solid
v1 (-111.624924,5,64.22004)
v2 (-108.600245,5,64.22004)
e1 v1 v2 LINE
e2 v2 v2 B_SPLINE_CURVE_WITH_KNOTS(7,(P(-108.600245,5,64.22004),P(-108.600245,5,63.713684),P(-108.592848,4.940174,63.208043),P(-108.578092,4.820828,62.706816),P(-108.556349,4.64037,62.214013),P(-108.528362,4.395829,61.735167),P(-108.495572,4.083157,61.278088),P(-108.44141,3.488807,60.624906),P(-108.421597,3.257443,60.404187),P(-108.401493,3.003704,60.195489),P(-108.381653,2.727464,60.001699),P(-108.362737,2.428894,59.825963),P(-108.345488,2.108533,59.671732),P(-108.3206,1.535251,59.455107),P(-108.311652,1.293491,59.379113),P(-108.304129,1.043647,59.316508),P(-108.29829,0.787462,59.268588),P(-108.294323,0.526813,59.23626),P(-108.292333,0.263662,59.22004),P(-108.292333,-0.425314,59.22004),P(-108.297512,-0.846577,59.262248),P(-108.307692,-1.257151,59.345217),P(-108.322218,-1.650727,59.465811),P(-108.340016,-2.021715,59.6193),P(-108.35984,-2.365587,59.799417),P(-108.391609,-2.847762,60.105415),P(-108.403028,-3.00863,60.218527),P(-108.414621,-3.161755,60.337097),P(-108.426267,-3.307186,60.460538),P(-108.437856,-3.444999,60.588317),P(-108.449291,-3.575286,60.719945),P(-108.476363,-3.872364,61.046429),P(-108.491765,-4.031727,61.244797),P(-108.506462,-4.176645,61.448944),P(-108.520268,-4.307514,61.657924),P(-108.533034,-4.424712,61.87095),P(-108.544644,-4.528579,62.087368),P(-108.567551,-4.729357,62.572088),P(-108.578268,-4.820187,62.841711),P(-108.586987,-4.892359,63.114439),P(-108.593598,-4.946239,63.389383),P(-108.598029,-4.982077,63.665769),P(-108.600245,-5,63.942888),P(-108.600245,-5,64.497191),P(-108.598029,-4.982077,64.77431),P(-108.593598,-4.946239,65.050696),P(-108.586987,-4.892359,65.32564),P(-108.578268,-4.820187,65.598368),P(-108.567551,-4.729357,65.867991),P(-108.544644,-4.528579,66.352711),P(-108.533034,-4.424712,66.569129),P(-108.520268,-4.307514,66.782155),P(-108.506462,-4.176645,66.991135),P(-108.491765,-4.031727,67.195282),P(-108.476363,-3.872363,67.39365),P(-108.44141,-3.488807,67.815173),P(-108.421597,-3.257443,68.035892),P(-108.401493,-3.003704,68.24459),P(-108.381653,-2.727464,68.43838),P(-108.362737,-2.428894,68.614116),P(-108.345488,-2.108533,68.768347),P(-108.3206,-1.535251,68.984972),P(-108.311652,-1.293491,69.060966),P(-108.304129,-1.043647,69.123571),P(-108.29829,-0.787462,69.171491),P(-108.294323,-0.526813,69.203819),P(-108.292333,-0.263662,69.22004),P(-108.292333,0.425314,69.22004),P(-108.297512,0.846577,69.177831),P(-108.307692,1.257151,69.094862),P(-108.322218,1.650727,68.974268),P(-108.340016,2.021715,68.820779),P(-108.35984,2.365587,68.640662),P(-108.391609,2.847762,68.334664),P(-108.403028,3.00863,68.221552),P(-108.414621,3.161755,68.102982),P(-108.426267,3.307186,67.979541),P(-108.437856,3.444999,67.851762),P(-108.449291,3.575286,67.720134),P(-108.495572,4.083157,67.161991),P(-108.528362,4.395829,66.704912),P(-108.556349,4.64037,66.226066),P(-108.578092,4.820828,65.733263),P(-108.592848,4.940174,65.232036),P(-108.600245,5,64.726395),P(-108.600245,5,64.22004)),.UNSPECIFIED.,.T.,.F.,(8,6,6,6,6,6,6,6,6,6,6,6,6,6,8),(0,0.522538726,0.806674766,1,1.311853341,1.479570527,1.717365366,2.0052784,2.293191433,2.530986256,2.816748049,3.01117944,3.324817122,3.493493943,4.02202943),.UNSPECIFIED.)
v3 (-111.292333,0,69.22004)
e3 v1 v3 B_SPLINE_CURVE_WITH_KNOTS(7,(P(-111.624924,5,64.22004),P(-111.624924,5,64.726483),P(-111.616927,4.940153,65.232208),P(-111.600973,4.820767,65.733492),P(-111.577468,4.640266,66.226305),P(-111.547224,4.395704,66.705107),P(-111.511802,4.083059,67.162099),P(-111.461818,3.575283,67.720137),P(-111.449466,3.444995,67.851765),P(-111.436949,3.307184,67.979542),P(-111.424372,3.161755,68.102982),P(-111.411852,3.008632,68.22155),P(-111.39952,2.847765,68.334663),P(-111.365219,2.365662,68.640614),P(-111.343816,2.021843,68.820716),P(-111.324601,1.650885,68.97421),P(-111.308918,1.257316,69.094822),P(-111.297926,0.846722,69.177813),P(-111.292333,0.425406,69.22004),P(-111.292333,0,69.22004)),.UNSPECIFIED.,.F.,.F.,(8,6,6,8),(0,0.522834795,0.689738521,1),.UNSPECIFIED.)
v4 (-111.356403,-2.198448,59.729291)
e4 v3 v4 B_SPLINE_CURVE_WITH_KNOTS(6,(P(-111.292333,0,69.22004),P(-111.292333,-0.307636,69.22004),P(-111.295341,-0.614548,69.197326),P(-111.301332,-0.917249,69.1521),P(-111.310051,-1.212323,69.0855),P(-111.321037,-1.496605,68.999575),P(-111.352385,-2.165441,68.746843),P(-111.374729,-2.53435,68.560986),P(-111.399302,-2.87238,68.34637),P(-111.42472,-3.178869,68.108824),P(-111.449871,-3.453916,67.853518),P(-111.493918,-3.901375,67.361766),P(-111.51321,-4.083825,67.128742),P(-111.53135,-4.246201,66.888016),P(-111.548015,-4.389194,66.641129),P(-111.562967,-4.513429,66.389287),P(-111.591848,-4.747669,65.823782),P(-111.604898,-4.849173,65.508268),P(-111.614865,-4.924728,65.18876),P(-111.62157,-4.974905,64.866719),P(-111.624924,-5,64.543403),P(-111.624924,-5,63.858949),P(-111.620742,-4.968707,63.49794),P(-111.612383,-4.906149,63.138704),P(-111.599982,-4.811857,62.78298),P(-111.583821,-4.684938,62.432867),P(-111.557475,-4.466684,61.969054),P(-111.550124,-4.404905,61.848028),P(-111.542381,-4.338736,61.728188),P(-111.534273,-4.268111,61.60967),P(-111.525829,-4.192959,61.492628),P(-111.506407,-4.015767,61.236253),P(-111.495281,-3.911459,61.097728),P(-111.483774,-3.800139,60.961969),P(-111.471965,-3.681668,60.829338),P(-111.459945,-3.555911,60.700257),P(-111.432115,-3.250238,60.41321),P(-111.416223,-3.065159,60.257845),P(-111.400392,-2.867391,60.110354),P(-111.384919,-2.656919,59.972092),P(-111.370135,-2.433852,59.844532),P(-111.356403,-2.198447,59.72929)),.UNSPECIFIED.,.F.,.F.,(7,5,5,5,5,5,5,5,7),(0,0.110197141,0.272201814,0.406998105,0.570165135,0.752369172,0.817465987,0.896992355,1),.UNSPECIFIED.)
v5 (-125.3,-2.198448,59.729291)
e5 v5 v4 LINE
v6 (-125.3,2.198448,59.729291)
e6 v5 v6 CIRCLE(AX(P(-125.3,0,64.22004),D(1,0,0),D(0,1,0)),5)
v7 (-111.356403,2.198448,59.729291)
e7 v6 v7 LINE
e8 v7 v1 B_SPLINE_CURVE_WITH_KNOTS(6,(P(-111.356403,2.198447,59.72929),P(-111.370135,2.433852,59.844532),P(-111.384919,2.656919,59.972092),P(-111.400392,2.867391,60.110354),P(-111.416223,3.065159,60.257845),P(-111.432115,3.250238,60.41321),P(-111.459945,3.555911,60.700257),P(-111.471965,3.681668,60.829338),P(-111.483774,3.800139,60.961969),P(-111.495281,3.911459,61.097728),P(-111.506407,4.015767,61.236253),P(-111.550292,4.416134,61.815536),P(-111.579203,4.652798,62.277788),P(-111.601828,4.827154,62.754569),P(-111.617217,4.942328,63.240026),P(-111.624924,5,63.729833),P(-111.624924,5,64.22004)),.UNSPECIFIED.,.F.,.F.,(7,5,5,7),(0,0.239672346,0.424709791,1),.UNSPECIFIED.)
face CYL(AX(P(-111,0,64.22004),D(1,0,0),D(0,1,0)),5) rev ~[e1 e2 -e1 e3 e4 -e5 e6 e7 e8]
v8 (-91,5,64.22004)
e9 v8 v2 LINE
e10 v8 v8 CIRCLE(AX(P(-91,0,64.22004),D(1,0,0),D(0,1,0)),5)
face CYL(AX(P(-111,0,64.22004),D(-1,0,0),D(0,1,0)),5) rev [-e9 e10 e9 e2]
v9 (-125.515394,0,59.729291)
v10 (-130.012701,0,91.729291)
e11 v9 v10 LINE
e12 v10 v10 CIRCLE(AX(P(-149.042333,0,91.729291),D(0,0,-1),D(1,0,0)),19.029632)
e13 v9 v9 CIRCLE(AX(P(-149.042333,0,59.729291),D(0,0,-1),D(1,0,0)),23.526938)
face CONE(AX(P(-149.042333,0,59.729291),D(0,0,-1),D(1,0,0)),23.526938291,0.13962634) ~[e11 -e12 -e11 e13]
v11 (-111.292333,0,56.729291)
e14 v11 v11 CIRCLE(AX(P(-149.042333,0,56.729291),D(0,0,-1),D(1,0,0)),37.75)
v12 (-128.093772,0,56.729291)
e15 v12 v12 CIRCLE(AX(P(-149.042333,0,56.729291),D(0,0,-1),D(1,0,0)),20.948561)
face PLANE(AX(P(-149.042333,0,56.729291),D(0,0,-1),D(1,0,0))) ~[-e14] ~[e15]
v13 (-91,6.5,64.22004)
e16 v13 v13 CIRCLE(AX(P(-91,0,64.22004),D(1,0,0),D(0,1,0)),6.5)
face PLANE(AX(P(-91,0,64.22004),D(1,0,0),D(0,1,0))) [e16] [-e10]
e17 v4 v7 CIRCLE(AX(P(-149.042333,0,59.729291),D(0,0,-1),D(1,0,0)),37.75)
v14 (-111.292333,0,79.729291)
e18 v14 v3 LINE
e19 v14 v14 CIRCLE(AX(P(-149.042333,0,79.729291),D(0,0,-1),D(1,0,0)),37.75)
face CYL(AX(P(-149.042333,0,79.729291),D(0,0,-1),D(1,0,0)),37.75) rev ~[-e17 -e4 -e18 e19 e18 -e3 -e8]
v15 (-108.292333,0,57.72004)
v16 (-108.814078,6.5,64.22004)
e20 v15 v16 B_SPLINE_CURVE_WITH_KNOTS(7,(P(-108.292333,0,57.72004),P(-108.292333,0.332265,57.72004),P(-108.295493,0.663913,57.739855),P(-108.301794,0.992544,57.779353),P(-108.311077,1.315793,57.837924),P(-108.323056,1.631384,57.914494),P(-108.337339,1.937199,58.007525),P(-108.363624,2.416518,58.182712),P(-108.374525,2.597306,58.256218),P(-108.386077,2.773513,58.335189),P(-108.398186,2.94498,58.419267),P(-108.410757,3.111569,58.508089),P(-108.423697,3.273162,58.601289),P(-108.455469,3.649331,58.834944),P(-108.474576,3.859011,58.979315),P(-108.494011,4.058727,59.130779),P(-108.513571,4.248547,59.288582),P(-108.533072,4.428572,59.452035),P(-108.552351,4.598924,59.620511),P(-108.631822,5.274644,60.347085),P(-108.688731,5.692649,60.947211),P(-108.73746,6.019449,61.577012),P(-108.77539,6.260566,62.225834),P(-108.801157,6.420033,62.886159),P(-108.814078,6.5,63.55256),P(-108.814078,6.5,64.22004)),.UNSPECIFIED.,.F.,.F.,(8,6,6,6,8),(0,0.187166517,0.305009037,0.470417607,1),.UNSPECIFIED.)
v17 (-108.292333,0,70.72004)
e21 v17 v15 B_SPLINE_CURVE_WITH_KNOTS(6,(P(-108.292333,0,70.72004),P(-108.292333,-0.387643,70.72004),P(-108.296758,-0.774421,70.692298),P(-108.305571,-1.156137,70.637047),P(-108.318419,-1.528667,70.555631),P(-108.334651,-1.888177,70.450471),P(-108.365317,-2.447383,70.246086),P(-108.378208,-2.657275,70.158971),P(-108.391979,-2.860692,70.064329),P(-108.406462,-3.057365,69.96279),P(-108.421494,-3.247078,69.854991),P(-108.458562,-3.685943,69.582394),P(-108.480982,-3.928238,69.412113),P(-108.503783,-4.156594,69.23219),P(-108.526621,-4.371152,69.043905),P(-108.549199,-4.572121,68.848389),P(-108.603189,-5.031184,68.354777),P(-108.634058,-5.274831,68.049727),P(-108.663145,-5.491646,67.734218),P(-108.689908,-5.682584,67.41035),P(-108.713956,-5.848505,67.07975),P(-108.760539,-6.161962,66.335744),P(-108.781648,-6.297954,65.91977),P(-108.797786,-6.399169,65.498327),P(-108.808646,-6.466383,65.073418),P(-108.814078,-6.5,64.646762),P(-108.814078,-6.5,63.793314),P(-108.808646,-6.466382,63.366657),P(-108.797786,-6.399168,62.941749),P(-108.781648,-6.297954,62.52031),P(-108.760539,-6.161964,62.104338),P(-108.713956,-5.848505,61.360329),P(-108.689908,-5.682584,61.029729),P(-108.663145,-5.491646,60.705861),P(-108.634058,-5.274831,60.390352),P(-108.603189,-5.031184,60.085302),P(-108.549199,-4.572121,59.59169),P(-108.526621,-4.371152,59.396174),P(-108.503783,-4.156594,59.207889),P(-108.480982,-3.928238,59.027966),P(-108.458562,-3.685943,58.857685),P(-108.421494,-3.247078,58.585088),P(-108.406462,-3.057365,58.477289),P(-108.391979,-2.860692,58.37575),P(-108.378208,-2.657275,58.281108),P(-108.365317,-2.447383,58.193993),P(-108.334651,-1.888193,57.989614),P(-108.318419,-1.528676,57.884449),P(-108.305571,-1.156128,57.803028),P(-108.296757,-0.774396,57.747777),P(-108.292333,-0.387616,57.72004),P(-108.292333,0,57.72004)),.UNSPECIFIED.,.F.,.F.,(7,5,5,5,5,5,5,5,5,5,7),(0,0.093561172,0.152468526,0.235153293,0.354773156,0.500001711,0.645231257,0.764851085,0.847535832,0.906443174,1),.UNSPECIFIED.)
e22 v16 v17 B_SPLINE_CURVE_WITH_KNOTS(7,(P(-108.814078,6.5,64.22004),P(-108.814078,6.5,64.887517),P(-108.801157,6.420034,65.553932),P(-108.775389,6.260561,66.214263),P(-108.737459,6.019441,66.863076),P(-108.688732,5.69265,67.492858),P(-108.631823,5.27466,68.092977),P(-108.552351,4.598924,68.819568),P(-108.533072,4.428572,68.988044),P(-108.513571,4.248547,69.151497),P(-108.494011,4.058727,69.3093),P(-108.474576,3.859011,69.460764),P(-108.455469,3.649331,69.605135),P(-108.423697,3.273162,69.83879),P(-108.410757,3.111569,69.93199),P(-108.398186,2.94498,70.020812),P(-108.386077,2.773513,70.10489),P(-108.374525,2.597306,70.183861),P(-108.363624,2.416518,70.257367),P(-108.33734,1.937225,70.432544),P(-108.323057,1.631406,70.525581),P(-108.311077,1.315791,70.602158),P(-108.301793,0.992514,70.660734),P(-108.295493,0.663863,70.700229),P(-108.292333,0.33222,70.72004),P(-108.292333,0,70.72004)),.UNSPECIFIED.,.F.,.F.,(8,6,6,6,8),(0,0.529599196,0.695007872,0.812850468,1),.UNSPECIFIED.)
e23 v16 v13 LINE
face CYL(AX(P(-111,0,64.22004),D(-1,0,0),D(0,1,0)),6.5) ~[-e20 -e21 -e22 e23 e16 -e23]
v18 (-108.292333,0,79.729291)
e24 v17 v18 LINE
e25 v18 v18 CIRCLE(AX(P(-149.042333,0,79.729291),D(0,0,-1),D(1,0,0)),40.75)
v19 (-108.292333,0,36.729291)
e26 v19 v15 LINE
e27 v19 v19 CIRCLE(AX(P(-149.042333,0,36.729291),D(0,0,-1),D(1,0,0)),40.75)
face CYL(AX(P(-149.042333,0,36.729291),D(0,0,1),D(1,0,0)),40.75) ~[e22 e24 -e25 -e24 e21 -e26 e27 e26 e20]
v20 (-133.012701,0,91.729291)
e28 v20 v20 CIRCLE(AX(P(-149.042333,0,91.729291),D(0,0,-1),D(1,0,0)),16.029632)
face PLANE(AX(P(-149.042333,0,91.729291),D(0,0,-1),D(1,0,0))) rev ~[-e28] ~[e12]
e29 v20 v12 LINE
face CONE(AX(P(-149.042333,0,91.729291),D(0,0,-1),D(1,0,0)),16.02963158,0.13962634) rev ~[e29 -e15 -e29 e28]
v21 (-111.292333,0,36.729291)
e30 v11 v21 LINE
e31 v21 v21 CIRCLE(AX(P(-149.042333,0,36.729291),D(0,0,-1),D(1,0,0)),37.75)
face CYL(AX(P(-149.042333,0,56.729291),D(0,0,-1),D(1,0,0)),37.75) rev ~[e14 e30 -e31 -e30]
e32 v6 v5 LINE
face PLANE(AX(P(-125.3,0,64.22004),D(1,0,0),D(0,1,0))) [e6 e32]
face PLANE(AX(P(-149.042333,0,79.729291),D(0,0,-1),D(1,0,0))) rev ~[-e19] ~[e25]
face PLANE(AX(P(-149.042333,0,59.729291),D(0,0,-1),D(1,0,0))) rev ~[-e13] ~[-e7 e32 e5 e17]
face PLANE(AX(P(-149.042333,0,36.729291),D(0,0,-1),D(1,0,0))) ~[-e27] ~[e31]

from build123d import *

# Parameters (mm, degrees)
F3_R     = 6.5
F3_R_2   = 5
F4_DEPTH = 20
F5_DEPTH = 14.3


with BuildPart() as f1:
    # F0 (on Front) → F1 (revolve)
    with BuildSketch(Plane.XZ):
        Polygon((-130.0127011951, 91.7292905117), (-133.0127011951, 91.7292905117), (-128.0937719805, 56.7292905117), (-111.2923327753, 56.7292905117), (-111.2923327753, 36.7292905117), (-108.2923327753, 36.7292905117), (-108.2923327753, 79.7292905117), (-111.2923327753, 79.7292905117), (-111.2923327753, 59.7292905117), (-125.5153944847, 59.7292905117), align=None)
    revolve(axis=Axis((-149.0423327753, 0, 54.1304184761), (0, 0, -1)))

    # F3 (on offset) → F4 (join)
    with BuildSketch(Plane.YZ.offset(-111)):
        with Locations((0, 64.2200395022)):
            Circle(F3_R)
        with Locations((0, 64.2200395022)):
            Circle(F3_R_2, mode=Mode.SUBTRACT)
    extrude(amount=F4_DEPTH)

    # F3 (on offset) → F5 (cut, symmetric)
    with BuildSketch(Plane.YZ.offset(-111)):
        with Locations((0, 64.2200395022)):
            Circle(F3_R_2)
    extrude(amount=F5_DEPTH, both=True, mode=Mode.SUBTRACT)


solid = f1.part
